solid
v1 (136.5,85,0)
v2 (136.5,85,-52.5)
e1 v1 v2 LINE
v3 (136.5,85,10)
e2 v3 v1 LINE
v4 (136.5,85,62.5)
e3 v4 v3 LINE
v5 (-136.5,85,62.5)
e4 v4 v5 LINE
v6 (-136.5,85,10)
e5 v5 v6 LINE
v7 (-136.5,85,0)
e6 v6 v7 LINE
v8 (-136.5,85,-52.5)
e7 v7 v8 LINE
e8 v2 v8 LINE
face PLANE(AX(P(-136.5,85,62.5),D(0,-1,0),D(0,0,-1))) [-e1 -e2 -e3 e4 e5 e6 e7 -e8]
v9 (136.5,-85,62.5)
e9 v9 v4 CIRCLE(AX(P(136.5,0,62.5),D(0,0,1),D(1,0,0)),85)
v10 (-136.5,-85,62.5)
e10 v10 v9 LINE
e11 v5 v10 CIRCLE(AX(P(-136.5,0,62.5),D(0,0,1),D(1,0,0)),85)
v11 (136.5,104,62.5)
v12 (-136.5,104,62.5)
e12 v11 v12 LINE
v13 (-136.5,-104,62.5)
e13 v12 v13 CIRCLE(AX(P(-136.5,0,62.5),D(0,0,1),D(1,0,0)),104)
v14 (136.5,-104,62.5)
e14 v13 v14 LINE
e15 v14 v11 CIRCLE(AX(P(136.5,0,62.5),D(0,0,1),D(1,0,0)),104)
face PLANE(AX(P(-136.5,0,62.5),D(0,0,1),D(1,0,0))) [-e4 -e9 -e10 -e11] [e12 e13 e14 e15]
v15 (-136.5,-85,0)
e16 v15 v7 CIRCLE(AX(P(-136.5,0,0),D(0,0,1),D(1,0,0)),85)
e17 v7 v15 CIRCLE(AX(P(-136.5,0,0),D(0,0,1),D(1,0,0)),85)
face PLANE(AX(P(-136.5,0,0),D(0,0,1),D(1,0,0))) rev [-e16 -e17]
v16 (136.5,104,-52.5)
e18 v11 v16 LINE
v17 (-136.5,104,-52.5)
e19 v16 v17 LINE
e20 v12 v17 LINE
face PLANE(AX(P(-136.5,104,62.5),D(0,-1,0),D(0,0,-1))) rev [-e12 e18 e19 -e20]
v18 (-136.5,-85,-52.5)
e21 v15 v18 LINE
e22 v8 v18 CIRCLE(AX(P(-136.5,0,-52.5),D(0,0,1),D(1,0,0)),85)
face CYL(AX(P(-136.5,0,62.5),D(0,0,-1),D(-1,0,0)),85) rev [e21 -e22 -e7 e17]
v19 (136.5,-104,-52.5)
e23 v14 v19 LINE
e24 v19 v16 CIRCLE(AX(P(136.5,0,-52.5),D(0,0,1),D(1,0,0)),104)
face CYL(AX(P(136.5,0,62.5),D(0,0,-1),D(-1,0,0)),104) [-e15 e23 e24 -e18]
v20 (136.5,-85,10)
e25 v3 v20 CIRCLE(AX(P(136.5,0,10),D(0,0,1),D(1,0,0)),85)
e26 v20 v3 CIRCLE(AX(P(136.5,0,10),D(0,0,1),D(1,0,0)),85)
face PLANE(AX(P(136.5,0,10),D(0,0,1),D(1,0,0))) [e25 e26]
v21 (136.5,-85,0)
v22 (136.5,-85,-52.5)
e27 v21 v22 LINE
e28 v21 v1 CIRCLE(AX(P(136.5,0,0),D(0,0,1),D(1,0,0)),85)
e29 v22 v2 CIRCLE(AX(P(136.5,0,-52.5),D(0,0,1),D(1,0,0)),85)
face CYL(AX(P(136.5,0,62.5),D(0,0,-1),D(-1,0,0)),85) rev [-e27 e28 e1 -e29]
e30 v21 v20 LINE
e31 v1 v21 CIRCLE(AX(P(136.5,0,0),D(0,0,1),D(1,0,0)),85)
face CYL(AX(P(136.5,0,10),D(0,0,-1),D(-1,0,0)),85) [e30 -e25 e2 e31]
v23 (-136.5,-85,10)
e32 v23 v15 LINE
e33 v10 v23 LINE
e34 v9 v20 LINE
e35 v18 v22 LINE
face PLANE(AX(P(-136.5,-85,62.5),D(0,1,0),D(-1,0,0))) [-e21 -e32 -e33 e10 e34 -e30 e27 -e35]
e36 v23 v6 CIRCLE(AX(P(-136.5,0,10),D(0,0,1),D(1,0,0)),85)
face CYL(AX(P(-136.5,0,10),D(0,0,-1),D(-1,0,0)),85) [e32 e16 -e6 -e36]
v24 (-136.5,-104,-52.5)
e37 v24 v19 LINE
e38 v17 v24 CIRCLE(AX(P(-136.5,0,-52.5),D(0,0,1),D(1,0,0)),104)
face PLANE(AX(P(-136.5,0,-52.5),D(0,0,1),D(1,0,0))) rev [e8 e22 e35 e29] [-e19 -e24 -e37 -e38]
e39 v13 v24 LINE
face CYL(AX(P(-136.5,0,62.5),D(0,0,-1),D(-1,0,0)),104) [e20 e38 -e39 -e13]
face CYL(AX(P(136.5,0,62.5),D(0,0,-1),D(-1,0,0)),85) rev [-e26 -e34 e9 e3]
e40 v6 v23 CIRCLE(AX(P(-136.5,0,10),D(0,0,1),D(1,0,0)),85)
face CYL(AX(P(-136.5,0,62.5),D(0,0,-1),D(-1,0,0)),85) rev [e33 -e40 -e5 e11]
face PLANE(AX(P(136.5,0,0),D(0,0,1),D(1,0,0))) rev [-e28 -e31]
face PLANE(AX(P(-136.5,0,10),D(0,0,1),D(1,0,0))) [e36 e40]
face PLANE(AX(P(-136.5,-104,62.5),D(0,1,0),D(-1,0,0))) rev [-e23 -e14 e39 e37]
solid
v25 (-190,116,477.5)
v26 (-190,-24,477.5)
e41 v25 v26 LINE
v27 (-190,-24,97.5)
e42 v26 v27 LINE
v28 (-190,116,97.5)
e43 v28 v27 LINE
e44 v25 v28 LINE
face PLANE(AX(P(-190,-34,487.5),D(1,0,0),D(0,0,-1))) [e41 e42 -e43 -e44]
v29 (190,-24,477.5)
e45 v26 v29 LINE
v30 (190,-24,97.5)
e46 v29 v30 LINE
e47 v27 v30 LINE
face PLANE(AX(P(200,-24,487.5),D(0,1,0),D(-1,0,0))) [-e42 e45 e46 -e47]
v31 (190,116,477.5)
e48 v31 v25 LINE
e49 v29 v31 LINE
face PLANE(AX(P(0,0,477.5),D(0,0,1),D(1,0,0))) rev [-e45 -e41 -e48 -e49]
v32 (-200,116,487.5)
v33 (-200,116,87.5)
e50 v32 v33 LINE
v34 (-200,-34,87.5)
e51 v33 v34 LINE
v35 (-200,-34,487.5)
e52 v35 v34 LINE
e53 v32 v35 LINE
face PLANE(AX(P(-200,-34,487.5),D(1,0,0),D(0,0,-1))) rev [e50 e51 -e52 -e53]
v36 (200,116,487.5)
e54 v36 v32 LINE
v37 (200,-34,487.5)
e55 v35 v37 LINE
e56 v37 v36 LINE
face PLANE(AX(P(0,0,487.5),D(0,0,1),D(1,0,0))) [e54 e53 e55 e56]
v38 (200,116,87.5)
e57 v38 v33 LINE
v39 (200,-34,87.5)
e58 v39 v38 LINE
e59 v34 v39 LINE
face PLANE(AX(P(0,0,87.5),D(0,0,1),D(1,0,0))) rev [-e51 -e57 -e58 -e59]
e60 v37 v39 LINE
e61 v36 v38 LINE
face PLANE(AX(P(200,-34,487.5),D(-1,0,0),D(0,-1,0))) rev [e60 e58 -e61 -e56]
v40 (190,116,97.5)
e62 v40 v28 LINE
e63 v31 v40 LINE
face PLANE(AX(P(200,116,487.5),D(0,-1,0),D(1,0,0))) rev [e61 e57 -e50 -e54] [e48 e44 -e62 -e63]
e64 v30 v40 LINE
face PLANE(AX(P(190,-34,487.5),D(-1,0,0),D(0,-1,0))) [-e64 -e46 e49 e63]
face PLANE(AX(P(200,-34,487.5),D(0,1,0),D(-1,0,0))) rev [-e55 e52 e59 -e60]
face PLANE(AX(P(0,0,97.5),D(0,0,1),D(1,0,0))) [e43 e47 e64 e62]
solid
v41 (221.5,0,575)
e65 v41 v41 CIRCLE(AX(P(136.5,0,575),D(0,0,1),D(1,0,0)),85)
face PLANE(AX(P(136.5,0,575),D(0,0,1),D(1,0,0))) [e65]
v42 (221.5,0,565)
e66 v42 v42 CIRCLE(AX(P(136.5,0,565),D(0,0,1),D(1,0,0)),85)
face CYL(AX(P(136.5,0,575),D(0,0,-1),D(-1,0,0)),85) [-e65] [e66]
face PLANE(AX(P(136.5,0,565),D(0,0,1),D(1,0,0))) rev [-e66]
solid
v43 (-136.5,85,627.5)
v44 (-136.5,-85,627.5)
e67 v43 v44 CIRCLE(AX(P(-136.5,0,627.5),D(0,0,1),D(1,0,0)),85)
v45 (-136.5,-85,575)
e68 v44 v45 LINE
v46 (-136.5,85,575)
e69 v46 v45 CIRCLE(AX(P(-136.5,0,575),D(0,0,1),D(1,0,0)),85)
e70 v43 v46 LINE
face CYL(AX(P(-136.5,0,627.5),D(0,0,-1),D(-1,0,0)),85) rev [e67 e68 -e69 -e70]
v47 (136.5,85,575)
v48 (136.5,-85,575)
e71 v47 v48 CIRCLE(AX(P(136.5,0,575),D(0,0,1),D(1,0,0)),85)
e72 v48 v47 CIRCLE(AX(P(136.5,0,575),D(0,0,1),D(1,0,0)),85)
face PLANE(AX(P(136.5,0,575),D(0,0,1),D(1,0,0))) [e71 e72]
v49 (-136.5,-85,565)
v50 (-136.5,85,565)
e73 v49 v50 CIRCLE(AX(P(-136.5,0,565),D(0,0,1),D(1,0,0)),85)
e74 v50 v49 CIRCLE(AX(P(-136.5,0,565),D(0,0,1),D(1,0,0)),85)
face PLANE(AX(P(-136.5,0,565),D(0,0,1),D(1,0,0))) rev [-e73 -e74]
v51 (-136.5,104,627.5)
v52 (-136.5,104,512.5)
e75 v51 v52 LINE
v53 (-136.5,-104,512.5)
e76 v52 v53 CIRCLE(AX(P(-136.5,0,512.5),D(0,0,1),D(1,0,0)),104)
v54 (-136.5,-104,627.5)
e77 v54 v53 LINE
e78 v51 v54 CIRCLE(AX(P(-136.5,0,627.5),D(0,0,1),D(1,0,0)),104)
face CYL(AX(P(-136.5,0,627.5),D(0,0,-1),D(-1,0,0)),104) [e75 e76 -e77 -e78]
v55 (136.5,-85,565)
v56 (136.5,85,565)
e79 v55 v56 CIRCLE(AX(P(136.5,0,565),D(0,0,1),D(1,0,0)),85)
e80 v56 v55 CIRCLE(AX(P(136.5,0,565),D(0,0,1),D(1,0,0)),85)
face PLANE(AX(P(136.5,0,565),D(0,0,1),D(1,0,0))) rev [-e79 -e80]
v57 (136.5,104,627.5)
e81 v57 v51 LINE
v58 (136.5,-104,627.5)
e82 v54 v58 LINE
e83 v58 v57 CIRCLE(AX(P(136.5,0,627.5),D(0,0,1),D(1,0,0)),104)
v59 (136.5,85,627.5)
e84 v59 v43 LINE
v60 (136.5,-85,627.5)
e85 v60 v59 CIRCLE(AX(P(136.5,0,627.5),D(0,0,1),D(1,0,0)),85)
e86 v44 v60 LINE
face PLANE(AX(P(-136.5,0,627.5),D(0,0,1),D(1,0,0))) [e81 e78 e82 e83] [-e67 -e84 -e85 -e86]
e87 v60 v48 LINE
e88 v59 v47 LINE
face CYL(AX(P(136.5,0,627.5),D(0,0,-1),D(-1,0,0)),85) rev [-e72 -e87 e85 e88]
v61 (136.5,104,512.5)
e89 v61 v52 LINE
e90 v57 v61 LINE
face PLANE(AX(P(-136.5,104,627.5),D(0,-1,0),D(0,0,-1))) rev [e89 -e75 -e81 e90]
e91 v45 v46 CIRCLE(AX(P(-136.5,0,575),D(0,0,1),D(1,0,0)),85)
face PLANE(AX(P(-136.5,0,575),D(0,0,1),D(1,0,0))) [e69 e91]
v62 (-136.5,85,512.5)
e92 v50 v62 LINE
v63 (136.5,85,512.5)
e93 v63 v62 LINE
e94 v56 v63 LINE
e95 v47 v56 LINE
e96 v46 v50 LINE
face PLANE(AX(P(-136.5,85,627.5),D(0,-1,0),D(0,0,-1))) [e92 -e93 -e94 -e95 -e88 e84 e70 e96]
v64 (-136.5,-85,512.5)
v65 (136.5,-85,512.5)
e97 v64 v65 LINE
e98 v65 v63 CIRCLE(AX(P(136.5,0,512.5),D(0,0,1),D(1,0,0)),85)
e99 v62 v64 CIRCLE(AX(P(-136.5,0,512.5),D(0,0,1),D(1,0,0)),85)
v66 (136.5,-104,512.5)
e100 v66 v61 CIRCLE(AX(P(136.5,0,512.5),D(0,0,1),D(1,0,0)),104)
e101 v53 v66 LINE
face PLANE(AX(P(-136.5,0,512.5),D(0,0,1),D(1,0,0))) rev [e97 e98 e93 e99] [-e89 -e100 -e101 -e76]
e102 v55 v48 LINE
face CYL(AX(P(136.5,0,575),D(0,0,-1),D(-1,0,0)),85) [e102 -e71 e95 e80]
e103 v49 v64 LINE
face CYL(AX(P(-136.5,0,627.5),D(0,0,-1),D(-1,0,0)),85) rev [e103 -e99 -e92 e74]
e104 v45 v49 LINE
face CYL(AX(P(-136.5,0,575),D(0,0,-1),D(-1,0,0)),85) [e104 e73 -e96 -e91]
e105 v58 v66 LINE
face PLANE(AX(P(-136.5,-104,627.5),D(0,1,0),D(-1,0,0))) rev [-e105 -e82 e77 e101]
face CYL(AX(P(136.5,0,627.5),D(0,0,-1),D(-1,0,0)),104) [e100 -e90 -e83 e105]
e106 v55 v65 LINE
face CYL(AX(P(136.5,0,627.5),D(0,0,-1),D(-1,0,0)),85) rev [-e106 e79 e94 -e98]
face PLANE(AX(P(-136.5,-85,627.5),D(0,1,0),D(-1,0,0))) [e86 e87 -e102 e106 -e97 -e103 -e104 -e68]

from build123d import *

# Parameters (mm, degrees)
SCHIZZO1_R                     = 85
ESTRUSIONE_ESTRUSIONE1_DEPTH   = 10
ESTRUSIONE_ESTRUSIONE1_2_DEPTH = 10
ESTRUSIONE_SOTTILE1_START      = -62.5
ESTRUSIONE_SOTTILE1_DEPTH      = 115
SCHIZZO3_W                     = 400
SCHIZZO3_H                     = 150
ESTRUSIONE_ESTRUSIONE2_DEPTH   = 400
SVUOTA1_T                      = -10
RIPETIZIONE_START              = 565
RIPETIZIONE_A_L2_OUTLINE_R     = 85
RIPETIZIONE_A_L2_DEPTH         = 10
RIPETIZIONE_START_2            = 512.5
RIPETIZIONE_A_L2_2_DEPTH       = 115
RIPETIZIONE_A_L2_3_OUTLINE_R   = 85
RIPETIZIONE_A_L2_3_DEPTH       = 10


# Read off the part's stored shape, not the designer's step: Ripetizione a L2
with BuildPart() as part:
    # Schizzo1 → Estrusione-Estrusione1 (new body)
    with BuildSketch(Plane.XY):
        with Locations((-136.5, 0)):
            Circle(SCHIZZO1_R)
    extrude(amount=ESTRUSIONE_ESTRUSIONE1_DEPTH)



with BuildPart() as body_2:
    # Schizzo1 → Estrusione-Estrusione1 2 (new body)
    with BuildSketch(Plane.XY):
        with Locations((136.5, 0)):
            Circle(SCHIZZO1_R)
    extrude(amount=ESTRUSIONE_ESTRUSIONE1_2_DEPTH)


with BuildPart() as part_1:
    add(part.part)

    add(body_2.part)  # Estrusione-Sottile1 merges body 2
    # Schizzo2 → Estrusione-Sottile1 (add)
    with BuildSketch(Plane.XY.offset(10).offset(ESTRUSIONE_SOTTILE1_START)):
        with BuildLine():
            Line((136.5, 104), (-136.5, 104))
            ThreePointArc((-136.5, 104), (-240.5, 0), (-136.5, -104))
            Line((-136.5, -104), (136.5, -104))
            ThreePointArc((136.5, -104), (240.5, 0), (136.5, 104))
        make_face()
        with BuildLine():
            Line((136.5, 85), (-136.5, 85))
            ThreePointArc((-136.5, 85), (-221.5, 0), (-136.5, -85))
            Line((-136.5, -85), (136.5, -85))
            ThreePointArc((136.5, -85), (221.5, 0), (136.5, 85))
        make_face(mode=Mode.SUBTRACT)
    extrude(amount=ESTRUSIONE_SOTTILE1_DEPTH)


with BuildPart() as body_2_2:
    # Schizzo3 → Estrusione-Estrusione2 (new body)
    with BuildSketch(Plane.XY.offset(87.5)):
        with Locations((0, 41)):
            Rectangle(SCHIZZO3_W, SCHIZZO3_H)
    extrude(amount=ESTRUSIONE_ESTRUSIONE2_DEPTH)

    # Svuota1
    svuota1_openings = [body_2_2.faces().sort_by_distance(p)[0] for p in [
        (0, 116, 287.5),
    ]]
    offset(amount=SVUOTA1_T, openings=svuota1_openings, kind=Kind.INTERSECTION)


with BuildPart() as body_3:
    # Ripetizione a L2 outline → Ripetizione a L2 (new body)
    with BuildSketch(Plane.XY.offset(RIPETIZIONE_START)):
        with Locations((136.5, 0)):
            Circle(RIPETIZIONE_A_L2_OUTLINE_R)
    extrude(amount=RIPETIZIONE_A_L2_DEPTH)


with BuildPart() as body_4:
    # Ripetizione a L2 2 outline → Ripetizione a L2 2 (new body)
    with BuildSketch(Plane.XY.offset(RIPETIZIONE_START_2)):
        with BuildLine():
            ThreePointArc((-136.5, 104), (-240.5, 0), (-136.5, -104))
            Line((-136.5, -104), (136.5, -104))
            ThreePointArc((136.5, -104), (240.5, 0), (136.5, 104))
            Line((136.5, 104), (-136.5, 104))
        make_face()
        with BuildLine():
            Line((-136.5, 85), (136.5, 85))
            ThreePointArc((136.5, 85), (221.5, 0), (136.5, -85))
            Line((136.5, -85), (-136.5, -85))
            ThreePointArc((-136.5, -85), (-221.5, 0), (-136.5, 85))
        make_face(mode=Mode.SUBTRACT)
    extrude(amount=RIPETIZIONE_A_L2_2_DEPTH)

    # Ripetizione a L2 3 outline → Ripetizione a L2 3 (add)
    with BuildSketch(Plane.XY.offset(RIPETIZIONE_START)):
        with Locations((136.5, 0)):
            Circle(RIPETIZIONE_A_L2_3_OUTLINE_R)
        with Locations((-136.5, 0)):
            Circle(RIPETIZIONE_A_L2_3_OUTLINE_R)
    extrude(amount=RIPETIZIONE_A_L2_3_DEPTH)


solid = Compound([part_1.part, body_2_2.part, body_3.part, body_4.part])
